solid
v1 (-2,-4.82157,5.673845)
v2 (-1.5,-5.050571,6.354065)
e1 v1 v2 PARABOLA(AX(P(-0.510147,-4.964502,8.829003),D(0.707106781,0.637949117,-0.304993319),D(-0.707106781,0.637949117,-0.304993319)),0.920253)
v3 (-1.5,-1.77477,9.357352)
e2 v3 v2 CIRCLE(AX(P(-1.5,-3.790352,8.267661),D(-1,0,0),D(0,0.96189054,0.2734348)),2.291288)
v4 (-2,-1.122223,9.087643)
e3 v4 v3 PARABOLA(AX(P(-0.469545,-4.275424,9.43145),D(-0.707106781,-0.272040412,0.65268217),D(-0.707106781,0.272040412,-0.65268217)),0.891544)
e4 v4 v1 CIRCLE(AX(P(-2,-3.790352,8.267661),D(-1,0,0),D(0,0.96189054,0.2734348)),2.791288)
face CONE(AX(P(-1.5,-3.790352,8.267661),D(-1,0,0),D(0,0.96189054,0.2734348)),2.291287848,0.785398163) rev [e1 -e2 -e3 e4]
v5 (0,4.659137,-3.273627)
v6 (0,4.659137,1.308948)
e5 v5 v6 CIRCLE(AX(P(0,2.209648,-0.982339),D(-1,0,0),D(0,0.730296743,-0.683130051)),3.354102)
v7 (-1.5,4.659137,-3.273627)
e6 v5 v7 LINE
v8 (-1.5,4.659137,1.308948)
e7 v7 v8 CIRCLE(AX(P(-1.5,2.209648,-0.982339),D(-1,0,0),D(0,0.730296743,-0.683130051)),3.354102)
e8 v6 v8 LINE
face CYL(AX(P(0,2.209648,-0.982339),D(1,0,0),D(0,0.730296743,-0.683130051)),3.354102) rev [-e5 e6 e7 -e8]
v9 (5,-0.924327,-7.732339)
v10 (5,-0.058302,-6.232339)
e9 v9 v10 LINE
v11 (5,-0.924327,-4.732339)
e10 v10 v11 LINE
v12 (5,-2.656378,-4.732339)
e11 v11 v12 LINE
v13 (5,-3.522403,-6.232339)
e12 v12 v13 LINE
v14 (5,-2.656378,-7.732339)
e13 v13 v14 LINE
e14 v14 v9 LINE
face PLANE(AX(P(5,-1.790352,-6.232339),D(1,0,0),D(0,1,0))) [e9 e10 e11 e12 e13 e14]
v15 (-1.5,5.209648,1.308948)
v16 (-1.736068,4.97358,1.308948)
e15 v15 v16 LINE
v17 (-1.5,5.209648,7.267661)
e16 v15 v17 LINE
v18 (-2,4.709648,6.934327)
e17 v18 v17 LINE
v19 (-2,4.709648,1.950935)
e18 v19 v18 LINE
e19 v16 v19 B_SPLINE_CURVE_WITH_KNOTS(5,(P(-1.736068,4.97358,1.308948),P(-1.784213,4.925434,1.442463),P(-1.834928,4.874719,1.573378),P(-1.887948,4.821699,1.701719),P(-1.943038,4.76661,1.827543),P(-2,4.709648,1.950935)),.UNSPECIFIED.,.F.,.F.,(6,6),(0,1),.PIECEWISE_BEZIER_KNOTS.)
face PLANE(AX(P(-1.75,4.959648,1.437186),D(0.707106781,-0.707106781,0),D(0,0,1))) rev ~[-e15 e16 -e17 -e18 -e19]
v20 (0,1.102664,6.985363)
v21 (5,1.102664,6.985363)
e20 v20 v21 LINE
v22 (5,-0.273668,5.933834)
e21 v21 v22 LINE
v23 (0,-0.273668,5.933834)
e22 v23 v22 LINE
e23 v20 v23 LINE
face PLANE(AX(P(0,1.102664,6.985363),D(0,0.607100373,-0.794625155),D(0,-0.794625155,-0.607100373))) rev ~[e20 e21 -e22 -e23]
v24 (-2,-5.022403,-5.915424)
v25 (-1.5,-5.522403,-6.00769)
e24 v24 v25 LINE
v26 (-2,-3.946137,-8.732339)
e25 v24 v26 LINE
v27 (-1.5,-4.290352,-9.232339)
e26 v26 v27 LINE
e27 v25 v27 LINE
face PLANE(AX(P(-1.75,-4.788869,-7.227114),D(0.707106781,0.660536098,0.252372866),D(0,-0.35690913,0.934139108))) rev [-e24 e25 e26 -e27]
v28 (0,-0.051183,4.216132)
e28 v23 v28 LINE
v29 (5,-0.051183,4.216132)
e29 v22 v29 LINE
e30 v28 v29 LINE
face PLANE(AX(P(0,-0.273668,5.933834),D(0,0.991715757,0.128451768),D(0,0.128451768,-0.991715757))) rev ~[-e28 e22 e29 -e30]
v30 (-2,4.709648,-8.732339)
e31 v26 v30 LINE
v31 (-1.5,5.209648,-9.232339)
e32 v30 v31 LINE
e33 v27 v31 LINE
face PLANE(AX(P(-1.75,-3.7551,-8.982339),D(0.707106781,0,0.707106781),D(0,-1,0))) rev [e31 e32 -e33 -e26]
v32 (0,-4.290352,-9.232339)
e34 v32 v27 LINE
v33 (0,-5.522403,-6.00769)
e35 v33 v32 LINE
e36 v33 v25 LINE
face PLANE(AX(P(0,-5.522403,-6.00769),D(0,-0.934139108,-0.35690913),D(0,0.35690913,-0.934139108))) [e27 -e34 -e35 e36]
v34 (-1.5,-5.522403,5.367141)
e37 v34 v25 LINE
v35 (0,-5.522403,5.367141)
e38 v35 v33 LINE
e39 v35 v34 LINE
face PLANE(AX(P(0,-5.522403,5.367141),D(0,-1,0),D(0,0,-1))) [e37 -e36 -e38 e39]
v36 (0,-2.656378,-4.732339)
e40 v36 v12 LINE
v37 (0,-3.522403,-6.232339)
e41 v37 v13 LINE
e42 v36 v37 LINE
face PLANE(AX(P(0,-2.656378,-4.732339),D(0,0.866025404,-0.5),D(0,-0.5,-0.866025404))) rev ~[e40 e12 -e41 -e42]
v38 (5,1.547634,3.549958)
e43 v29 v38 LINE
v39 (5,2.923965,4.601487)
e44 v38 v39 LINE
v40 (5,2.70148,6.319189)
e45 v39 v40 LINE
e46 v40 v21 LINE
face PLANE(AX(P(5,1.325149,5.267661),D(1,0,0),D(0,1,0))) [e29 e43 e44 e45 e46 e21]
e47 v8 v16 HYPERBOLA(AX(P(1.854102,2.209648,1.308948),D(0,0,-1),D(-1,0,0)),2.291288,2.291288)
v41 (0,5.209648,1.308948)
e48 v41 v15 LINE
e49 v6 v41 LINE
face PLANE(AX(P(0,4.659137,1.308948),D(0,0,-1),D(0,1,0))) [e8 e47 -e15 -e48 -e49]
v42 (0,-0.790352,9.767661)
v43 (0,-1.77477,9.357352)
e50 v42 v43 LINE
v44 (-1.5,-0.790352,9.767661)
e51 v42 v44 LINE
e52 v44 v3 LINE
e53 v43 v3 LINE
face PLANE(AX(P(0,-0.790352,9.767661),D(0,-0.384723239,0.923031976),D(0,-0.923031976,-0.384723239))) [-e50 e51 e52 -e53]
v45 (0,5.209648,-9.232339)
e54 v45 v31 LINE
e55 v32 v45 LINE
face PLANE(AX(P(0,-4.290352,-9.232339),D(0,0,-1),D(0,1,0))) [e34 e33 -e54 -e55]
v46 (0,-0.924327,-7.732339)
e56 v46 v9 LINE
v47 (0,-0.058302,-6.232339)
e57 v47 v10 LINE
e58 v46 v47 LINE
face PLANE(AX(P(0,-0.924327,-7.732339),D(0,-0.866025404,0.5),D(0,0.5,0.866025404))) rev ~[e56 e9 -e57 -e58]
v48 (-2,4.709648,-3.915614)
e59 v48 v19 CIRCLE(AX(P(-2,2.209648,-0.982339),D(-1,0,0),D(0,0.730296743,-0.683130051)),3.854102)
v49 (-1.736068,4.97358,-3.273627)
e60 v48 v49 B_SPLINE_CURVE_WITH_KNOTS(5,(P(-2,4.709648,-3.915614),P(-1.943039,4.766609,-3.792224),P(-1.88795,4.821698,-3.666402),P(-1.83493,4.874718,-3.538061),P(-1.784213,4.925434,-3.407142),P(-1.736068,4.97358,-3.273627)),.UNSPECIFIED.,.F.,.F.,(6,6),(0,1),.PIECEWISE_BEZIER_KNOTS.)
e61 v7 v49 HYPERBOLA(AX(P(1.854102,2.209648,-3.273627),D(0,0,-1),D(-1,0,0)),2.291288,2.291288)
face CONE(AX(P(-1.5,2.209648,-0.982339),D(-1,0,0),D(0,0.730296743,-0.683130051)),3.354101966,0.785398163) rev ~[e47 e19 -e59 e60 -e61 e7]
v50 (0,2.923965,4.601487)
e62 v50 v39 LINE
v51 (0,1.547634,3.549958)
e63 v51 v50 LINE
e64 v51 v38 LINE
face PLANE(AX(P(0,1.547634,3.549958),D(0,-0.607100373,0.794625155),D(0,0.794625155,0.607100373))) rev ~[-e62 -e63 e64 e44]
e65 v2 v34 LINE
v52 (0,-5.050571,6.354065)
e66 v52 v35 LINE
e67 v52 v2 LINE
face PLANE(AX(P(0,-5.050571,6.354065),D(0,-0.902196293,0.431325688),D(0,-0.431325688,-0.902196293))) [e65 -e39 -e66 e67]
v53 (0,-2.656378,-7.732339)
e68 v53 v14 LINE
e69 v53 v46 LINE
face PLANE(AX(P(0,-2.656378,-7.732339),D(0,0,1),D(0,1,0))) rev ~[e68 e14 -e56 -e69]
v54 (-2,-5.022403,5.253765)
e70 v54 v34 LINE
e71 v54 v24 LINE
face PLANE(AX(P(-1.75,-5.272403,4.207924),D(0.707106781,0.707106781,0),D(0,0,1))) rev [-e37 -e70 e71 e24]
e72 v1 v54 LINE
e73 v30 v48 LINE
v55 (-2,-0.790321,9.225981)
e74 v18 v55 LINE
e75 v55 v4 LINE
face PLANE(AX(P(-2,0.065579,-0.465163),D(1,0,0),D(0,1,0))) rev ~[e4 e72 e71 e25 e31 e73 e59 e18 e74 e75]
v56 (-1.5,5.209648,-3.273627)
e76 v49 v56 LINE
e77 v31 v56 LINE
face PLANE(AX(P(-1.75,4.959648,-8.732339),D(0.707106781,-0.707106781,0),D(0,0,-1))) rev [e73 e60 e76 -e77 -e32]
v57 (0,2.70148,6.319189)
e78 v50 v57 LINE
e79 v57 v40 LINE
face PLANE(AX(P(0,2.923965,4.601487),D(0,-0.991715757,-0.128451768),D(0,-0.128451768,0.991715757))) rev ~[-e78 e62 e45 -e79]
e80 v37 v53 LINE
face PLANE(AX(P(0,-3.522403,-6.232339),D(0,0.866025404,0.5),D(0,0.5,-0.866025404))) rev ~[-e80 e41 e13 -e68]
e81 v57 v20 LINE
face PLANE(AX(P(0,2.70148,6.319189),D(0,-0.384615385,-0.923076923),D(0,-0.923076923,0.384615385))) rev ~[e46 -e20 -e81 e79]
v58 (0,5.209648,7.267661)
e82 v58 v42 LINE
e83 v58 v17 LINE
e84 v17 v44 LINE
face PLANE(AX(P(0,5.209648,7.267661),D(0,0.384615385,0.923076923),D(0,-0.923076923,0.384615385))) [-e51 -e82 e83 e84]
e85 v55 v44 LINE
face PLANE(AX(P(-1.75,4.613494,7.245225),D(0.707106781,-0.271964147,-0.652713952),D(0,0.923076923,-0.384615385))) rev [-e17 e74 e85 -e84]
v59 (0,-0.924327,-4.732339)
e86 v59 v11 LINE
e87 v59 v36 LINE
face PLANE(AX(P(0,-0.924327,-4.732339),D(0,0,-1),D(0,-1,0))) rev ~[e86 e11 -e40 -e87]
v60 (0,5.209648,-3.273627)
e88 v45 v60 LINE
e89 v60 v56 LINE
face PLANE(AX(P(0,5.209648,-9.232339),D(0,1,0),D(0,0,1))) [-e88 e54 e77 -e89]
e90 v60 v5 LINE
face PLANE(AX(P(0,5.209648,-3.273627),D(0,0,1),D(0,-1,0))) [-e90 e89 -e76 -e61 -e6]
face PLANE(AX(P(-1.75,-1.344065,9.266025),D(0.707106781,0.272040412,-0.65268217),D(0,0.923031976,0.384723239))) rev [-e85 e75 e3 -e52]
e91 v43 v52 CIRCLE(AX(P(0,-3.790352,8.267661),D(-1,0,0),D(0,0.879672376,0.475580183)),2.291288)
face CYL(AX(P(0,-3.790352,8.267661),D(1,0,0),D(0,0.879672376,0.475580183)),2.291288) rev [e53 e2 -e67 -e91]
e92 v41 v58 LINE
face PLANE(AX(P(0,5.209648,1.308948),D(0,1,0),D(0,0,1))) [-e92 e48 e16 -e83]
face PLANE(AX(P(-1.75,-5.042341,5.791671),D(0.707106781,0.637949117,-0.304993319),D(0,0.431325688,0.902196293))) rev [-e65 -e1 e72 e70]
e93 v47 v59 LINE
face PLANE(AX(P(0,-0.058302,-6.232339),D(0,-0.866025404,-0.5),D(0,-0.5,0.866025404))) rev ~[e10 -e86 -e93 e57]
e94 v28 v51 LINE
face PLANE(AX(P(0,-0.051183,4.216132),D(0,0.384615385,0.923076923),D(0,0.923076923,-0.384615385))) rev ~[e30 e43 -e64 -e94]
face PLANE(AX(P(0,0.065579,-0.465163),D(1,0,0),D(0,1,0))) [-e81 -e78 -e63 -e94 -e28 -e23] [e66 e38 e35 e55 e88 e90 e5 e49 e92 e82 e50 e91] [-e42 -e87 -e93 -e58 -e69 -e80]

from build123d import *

# Parameters (mm, degrees)
F1_DEPTH    = 2
F2_DEPTH    = 5
F3_C1_SIZE  = 0.5
F3_C2_SIZE  = 0.5
F3_C3_SIZE  = 0.5
F3_C4_SIZE  = 0.5
F3_C5_SIZE  = 0.5
F3_C6_SIZE  = 0.5
F3_C7_SIZE  = 0.5
F3_C8_SIZE  = 0.5
F3_C9_SIZE  = 0.5
F3_C10_SIZE = 0.5


with BuildPart() as f1:
    # F0 (on Right) → F1 (new body)
    with BuildSketch(Plane.YZ):
        with BuildLine():
            Line((4.6591372722, 1.30894838), (5.2096475294, 1.30894838))
            Line((5.2096475294, 1.30894838), (5.2096475294, 7.2676605325))
            Line((5.2096475294, 7.2676605325), (-0.7903524706, 9.7676605325))
            Line((-0.7903524706, 9.7676605325), (-1.7747698447, 9.3573516256))
            ThreePointArc((-1.7747698447, 9.3573516256), (-2.2419413153, 6.578748784), (-5.0505708614, 6.3540645439))
            Line((-5.0505708614, 6.3540645439), (-5.5224032781, 5.3671410452))
            Line((-5.5224032781, 5.3671410452), (-5.5224032781, -6.0076899798))
            Line((-5.5224032781, -6.0076899798), (-4.2903524706, -9.2323394675))
            Line((-4.2903524706, -9.2323394675), (5.2096475294, -9.2323394675))
            Line((5.2096475294, -9.2323394675), (5.2096475294, -3.273627315))
            Line((5.2096475294, -3.273627315), (4.6591372722, -3.273627315))
            ThreePointArc((4.6591372722, -3.273627315), (-1.1444544368, -0.9823394675), (4.6591372722, 1.30894838))
        make_face()
        Polygon((-0.058301663, -6.2323394675), (-0.9243270668, -7.7323394675), (-2.6563778744, -7.7323394675), (-3.5224032781, -6.2323394675), (-2.6563778744, -4.7323394675), (-0.9243270668, -4.7323394675), align=None, mode=Mode.SUBTRACT)
        Polygon((-0.2736675582, 5.93383392), (1.1026635838, 6.9853626109), (2.7014797138, 6.3191892234), (2.9239647019, 4.601487145), (1.54763356, 3.5499584541), (-0.0511825701, 4.2161318417), align=None, mode=Mode.SUBTRACT)
        Polygon((-2.6563778744, -7.7323394675), (-0.9243270668, -7.7323394675), (-0.058301663, -6.2323394675), (-0.9243270668, -4.7323394675), (-2.6563778744, -4.7323394675), (-3.5224032781, -6.2323394675), align=None)
        Polygon((2.7014797138, 6.3191892234), (1.1026635838, 6.9853626109), (-0.2736675582, 5.93383392), (-0.0511825701, 4.2161318417), (1.54763356, 3.5499584541), (2.9239647019, 4.601487145), align=None)
    extrude(amount=-F1_DEPTH)

    # F0 (on Right) → F2 (join)
    with BuildSketch(Plane.YZ):
        Polygon((2.7014797138, 6.3191892234), (1.1026635838, 6.9853626109), (-0.2736675582, 5.93383392), (-0.0511825701, 4.2161318417), (1.54763356, 3.5499584541), (2.9239647019, 4.601487145), align=None)
        Polygon((-2.6563778744, -7.7323394675), (-0.9243270668, -7.7323394675), (-0.058301663, -6.2323394675), (-0.9243270668, -4.7323394675), (-2.6563778744, -4.7323394675), (-3.5224032781, -6.2323394675), align=None)
    extrude(amount=F2_DEPTH)

    # F3: chamfer of 0.5 on 12 edges, made by hand

    # F3_c1
    f3_c1_edges = [f1.edges().sort_by_distance(p)[0] for p in [
        (-2, -1.1444544368, -0.9823394675),
    ]]
    chamfer(f3_c1_edges, length=F3_C1_SIZE)

    # F3_c2
    f3_c2_edges = [f1.edges().sort_by_distance(p)[0] for p in [
        (-2, 5.2096475294, 4.352423109),
    ]]
    chamfer(f3_c2_edges, length=F3_C2_SIZE)

    # F3_c3
    f3_c3_edges = [f1.edges().sort_by_distance(p)[0] for p in [
        (-2, 1.9596475294, 8.6218271992),
    ]]
    chamfer(f3_c3_edges, length=F3_C3_SIZE)

    # F3_c4
    f3_c4_edges = [f1.edges().sort_by_distance(p)[0] for p in [
        (-2, -1.6075076826, 9.4270671311),
    ]]
    chamfer(f3_c4_edges, length=F3_C4_SIZE)

    # F3_c5
    f3_c5_edges = [f1.edges().sort_by_distance(p)[0] for p in [
        (-2, -2.43546855, 6.4198809023),
    ]]
    chamfer(f3_c5_edges, length=F3_C5_SIZE)

    # F3_c6
    f3_c6_edges = [f1.edges().sort_by_distance(p)[0] for p in [
        (-2, -5.39514647, 5.633321854),
    ]]
    chamfer(f3_c6_edges, length=F3_C6_SIZE)

    # F3_c7
    f3_c7_edges = [f1.edges().sort_by_distance(p)[0] for p in [
        (-2, -5.5224032781, -0.8998828859),
    ]]
    chamfer(f3_c7_edges, length=F3_C7_SIZE)

    # F3_c8
    f3_c8_edges = [f1.edges().sort_by_distance(p)[0] for p in [
        (-2, -4.6563778744, -8.2743403139),
    ]]
    chamfer(f3_c8_edges, length=F3_C8_SIZE)

    # F3_c9
    f3_c9_edges = [f1.edges().sort_by_distance(p)[0] for p in [
        (-2, 0.7272736227, -9.2323394675),
    ]]
    chamfer(f3_c9_edges, length=F3_C9_SIZE)

    # F3_c10
    f3_c10_edges = [f1.edges().sort_by_distance(p)[0] for p in [
        (-2, 5.2096475294, -6.067102044),
    ]]
    chamfer(f3_c10_edges, length=F3_C10_SIZE)


solid = f1.part
